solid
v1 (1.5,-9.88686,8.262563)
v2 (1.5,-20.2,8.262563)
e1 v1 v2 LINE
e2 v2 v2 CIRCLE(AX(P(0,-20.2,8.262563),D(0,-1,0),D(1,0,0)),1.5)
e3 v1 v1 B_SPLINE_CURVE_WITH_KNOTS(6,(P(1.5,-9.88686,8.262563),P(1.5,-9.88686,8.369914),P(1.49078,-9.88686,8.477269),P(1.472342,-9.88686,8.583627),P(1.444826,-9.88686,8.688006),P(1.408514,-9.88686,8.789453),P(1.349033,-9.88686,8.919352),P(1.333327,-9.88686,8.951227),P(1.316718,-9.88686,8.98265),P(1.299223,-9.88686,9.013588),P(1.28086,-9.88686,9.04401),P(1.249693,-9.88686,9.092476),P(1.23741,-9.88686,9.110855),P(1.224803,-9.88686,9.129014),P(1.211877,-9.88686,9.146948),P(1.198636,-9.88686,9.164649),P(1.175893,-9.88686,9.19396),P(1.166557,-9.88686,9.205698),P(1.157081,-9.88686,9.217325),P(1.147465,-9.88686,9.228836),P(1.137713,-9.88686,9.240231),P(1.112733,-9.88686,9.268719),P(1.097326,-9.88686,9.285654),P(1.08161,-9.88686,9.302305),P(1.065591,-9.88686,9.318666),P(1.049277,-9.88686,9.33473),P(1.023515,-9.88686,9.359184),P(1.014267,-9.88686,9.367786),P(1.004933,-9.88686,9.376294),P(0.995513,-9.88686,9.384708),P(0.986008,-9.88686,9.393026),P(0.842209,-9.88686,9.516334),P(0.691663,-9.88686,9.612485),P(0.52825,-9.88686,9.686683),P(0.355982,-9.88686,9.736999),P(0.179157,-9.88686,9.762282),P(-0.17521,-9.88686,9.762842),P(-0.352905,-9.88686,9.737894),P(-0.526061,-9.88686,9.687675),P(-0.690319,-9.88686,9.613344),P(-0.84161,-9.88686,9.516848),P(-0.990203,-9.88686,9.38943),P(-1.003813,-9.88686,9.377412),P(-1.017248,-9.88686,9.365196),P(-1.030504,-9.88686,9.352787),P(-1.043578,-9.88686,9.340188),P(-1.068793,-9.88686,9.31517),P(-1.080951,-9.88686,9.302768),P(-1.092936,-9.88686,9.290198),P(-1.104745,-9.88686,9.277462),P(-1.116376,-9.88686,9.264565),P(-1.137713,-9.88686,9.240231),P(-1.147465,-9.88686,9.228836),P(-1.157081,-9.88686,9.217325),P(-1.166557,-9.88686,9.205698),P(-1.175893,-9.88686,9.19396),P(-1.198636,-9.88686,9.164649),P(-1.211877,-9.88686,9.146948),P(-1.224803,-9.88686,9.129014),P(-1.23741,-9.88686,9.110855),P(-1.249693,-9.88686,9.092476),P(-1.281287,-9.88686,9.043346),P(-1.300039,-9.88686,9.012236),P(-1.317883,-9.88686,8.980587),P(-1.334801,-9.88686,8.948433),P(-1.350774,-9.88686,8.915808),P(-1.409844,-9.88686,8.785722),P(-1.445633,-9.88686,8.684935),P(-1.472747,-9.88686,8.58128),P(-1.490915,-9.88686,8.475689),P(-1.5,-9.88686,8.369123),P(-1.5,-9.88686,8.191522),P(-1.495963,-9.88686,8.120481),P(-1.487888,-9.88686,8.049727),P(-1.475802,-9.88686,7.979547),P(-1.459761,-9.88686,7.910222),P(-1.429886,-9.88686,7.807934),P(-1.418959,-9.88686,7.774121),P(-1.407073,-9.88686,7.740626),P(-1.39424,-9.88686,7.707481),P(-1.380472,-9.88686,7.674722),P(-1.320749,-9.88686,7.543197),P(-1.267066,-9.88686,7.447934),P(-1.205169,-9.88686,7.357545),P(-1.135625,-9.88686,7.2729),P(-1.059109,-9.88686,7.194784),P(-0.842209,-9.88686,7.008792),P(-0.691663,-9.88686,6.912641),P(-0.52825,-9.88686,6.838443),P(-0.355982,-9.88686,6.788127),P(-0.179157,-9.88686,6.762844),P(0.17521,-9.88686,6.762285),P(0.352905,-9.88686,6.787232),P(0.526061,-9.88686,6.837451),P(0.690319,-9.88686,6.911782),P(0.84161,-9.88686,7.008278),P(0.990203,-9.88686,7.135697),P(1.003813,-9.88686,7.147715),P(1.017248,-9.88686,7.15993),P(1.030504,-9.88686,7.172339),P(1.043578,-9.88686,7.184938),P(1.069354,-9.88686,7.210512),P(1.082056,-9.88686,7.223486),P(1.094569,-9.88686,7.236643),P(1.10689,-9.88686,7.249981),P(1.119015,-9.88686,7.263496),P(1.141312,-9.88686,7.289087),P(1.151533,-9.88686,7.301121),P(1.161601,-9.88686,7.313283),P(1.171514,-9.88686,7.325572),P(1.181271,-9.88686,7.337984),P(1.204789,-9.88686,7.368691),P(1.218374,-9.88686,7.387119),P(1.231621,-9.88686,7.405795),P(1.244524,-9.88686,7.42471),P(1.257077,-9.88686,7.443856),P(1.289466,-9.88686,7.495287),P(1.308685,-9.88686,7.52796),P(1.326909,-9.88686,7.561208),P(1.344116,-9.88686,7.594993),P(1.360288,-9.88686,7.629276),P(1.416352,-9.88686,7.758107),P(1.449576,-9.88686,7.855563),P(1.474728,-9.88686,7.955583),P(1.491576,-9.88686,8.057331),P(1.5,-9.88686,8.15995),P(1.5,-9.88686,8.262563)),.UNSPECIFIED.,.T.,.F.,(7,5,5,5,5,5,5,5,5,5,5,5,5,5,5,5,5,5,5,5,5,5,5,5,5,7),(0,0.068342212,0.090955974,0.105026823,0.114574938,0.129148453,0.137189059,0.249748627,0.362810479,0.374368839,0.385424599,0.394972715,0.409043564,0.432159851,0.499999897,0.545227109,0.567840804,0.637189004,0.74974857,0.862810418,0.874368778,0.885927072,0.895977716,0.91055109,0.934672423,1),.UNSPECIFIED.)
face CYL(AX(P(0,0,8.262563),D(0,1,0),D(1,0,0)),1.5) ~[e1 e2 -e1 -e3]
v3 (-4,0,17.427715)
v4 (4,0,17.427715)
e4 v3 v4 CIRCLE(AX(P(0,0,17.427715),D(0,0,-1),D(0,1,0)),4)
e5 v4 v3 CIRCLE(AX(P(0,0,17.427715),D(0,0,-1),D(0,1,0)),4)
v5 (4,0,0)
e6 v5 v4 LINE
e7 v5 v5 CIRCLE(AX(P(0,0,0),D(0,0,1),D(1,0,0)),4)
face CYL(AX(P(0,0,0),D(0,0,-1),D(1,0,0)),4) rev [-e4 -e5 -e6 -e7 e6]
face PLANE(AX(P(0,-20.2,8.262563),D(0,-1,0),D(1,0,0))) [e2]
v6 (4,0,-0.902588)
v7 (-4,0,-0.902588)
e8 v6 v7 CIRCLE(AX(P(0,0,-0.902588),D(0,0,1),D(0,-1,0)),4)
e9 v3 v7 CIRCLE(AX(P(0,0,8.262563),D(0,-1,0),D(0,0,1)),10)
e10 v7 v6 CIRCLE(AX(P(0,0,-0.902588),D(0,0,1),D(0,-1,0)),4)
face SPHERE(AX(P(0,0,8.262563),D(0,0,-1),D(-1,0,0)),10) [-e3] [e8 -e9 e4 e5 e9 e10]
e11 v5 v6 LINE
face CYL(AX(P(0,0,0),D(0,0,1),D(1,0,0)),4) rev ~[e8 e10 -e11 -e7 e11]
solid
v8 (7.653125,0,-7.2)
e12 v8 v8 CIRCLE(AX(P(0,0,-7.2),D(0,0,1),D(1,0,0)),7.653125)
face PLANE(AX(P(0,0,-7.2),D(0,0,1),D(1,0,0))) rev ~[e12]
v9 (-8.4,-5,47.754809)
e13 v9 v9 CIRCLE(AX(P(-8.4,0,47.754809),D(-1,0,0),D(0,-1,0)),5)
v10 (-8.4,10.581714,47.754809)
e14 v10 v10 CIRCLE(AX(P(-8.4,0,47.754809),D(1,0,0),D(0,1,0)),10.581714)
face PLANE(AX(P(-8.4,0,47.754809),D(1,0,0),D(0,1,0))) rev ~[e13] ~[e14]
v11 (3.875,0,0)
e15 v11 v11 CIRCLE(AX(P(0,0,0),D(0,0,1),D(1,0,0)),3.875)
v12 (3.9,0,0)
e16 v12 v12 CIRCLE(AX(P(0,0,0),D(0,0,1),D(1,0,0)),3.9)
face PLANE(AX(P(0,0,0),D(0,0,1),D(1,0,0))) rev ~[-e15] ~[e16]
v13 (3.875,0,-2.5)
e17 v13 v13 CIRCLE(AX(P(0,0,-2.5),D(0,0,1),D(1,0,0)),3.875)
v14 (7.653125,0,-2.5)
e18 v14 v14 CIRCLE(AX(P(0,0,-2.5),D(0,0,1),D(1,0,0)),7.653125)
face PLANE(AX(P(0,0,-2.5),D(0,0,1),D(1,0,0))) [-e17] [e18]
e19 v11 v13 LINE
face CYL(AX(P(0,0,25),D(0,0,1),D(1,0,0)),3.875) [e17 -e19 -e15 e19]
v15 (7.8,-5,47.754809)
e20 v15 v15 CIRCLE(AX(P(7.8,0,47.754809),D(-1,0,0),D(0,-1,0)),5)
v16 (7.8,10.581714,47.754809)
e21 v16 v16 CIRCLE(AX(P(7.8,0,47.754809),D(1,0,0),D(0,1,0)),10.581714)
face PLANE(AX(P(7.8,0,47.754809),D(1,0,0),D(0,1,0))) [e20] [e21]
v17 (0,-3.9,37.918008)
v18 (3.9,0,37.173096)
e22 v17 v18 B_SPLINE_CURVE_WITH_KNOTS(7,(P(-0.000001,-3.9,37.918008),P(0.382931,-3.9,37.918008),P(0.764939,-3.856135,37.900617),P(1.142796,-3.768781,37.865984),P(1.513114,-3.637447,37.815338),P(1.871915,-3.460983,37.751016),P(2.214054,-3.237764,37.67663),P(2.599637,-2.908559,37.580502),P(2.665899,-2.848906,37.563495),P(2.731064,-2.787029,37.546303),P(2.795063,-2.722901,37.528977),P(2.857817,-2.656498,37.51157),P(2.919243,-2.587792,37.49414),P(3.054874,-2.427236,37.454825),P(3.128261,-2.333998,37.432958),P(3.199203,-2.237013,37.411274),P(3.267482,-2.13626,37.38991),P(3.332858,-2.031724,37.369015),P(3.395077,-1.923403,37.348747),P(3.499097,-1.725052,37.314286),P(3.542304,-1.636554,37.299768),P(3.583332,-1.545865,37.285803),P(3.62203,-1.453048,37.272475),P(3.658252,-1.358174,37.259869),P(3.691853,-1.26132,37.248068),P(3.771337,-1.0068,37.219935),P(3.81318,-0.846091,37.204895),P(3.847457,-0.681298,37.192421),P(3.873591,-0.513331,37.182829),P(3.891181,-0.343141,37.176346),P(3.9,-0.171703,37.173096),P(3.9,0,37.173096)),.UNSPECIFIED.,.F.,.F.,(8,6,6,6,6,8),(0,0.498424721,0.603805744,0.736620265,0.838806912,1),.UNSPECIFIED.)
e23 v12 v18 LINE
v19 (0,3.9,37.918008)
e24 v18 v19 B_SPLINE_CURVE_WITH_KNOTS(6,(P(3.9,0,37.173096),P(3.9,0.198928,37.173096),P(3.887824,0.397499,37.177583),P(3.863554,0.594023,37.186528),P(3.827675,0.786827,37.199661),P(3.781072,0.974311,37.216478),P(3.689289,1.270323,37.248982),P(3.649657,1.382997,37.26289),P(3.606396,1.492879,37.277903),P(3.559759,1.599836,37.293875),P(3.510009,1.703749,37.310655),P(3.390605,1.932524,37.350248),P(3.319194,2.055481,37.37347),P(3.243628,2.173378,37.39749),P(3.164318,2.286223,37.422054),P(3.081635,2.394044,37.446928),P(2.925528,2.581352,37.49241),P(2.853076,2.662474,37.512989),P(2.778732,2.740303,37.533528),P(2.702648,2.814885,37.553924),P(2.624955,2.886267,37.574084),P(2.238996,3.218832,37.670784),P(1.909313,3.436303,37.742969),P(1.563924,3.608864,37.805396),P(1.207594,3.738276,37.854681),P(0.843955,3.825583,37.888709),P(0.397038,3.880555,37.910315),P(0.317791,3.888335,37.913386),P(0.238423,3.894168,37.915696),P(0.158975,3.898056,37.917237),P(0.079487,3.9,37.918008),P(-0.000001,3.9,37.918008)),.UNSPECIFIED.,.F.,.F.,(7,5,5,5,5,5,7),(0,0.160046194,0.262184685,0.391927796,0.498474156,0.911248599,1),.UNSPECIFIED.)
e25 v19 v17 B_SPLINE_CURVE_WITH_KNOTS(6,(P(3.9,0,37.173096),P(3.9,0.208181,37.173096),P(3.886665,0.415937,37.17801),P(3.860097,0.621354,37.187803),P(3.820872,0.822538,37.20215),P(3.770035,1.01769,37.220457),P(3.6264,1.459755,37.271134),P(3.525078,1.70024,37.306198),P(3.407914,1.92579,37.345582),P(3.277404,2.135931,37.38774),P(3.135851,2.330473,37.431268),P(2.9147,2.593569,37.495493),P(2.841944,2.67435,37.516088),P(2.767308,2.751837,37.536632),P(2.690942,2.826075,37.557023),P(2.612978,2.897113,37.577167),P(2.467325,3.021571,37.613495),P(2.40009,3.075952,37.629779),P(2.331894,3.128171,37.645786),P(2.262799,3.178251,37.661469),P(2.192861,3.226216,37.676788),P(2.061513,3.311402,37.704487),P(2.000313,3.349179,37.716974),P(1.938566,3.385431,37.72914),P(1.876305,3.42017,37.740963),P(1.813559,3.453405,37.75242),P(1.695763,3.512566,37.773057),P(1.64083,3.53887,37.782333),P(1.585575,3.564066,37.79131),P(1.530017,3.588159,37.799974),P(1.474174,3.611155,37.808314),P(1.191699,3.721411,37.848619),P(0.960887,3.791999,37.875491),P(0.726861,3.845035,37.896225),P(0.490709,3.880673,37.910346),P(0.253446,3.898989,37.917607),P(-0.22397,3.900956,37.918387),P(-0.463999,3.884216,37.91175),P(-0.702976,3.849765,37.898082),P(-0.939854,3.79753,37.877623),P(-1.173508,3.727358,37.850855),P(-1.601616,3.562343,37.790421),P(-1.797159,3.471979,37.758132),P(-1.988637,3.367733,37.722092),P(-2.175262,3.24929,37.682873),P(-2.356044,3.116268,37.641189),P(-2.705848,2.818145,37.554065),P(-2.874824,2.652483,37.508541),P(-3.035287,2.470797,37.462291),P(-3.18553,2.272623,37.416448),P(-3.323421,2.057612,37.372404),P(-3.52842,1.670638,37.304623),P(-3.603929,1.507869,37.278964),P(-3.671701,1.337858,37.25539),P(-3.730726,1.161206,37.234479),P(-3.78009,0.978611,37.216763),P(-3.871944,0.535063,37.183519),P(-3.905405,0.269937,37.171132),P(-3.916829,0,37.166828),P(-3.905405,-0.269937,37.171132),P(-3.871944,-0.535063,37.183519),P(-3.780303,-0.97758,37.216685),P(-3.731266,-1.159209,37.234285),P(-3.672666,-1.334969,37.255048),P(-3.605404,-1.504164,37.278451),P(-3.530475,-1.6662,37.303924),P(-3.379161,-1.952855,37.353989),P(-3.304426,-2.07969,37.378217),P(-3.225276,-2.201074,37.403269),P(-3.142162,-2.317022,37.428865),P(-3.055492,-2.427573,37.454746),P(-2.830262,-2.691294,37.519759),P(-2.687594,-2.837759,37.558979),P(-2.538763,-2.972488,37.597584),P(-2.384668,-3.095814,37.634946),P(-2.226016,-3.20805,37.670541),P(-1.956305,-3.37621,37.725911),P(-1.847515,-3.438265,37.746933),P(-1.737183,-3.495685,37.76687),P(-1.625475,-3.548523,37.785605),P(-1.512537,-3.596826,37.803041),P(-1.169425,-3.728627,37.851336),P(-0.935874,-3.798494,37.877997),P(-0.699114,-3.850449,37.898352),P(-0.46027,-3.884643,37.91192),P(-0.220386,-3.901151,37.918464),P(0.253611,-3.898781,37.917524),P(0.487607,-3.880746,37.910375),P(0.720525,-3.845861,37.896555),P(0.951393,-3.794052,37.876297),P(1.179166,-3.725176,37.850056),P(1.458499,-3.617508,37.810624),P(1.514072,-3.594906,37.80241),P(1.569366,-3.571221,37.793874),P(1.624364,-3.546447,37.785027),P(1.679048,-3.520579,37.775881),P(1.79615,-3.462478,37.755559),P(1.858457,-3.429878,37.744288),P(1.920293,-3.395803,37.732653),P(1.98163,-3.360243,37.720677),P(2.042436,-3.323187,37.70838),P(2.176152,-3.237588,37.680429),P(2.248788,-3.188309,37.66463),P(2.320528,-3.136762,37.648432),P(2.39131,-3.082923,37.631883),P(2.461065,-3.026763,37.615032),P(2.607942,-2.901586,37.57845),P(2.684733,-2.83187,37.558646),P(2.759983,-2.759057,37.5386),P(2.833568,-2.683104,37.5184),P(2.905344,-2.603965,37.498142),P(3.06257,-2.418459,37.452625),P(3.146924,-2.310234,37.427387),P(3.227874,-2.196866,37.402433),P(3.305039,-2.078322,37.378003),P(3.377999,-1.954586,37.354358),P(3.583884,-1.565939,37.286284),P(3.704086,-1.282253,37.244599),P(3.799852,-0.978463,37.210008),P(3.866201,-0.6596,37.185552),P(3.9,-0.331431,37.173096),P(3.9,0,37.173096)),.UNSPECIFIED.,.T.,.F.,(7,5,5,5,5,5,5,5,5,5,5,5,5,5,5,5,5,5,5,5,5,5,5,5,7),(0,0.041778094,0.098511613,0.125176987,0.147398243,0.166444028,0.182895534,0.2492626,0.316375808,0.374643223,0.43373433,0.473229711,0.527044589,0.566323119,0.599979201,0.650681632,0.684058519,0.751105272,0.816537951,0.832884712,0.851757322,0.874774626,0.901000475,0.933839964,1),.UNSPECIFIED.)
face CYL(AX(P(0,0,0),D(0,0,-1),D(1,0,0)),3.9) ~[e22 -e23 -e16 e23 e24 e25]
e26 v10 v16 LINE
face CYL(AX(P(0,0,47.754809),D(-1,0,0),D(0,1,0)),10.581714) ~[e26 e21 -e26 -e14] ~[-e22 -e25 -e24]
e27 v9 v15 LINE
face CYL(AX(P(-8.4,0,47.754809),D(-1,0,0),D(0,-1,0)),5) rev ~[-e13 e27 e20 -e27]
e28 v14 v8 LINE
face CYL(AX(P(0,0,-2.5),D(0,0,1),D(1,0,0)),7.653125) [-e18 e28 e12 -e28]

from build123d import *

# Parameters (mm, degrees)
F0_R      = 1.5
F1_DEPTH  = 20.2
F4_R      = 4
F5_DEPTH  = 45.1
F8_DEPTH  = 25
F12_R     = 3.9
F13_DEPTH = 48
F15_R     = 3.875
F16_DEPTH = 32
F18_R     = 7.6531254966
F19_DEPTH = 4.7
F20_R     = 10.5817135641
F21_DEPTH = 7.8
F22_DEPTH = 16.2
F23_R     = 5
F24_DEPTH = 25


# Not quite as in the source:
# - a feature of the source that left no trace in its solid (it failed there, or was rolled back) is left out


with BuildPart() as f1:
    # F0 (on Front) → F1 (new body)
    with BuildSketch(Plane.XZ):
        with Locations((0, 8.262563113)):
            Circle(F0_R)
    extrude(amount=F1_DEPTH)

    # F2 (on Front) → F3 (revolve)
    with BuildSketch(Plane.XZ):
        with BuildLine():
            Line((0, -1.737436887), (0, 18.262563113))
            ThreePointArc((0, 18.262563113), (-10, 8.262563113), (0, -1.737436887))
        make_face()
    revolve(axis=Axis((0, 0, 8.262563113), (0, 0, -1)))

    # F4 (on Top) → F5 (cut)
    with BuildSketch(Plane.XY):
        Circle(F4_R)
    extrude(amount=F5_DEPTH, mode=Mode.SUBTRACT)

    # F4 (on Top) → F8 (cut)
    with BuildSketch(Plane.XY):
        Circle(F4_R)
    extrude(amount=-F8_DEPTH, mode=Mode.SUBTRACT)


with BuildPart() as f13:
    # F12 (on Top) → F13 (new body)
    with BuildSketch(Plane.XY):
        Circle(F12_R)
    extrude(amount=F13_DEPTH)

    # F15 (on offset) → F16 (join)
    with BuildSketch(Plane.XY.offset(25)):
        Circle(F15_R)
    extrude(amount=-F16_DEPTH)

    # F18 (on offset) → F19 (join)
    with BuildSketch(Plane.XY.offset(-2.5)):
        Circle(F18_R)
    extrude(amount=-F19_DEPTH)

    # F20 (on Right) → F21 (join)
    with BuildSketch(Plane.YZ):
        with Locations((0, 47.7548092604)):
            Circle(F20_R)
    extrude(amount=F21_DEPTH)

    # F22 (add): a face of the model
    f22_faces = [f13.faces().sort_by_distance(p)[0] for p in [
        (7.8, 0, 47.7548092604),
    ]]
    extrude(f22_faces, amount=-F22_DEPTH)

    # F23 (on face) → F24 (cut)
    with BuildSketch(Plane(origin=(-8.4, 0, 0), x_dir=(0, -1, 0), z_dir=(-1, 0, 0))):
        with Locations((0, 47.7548092604)):
            Circle(F23_R)
    extrude(amount=-F24_DEPTH, mode=Mode.SUBTRACT)


solid = Compound([f1.part, f13.part])
